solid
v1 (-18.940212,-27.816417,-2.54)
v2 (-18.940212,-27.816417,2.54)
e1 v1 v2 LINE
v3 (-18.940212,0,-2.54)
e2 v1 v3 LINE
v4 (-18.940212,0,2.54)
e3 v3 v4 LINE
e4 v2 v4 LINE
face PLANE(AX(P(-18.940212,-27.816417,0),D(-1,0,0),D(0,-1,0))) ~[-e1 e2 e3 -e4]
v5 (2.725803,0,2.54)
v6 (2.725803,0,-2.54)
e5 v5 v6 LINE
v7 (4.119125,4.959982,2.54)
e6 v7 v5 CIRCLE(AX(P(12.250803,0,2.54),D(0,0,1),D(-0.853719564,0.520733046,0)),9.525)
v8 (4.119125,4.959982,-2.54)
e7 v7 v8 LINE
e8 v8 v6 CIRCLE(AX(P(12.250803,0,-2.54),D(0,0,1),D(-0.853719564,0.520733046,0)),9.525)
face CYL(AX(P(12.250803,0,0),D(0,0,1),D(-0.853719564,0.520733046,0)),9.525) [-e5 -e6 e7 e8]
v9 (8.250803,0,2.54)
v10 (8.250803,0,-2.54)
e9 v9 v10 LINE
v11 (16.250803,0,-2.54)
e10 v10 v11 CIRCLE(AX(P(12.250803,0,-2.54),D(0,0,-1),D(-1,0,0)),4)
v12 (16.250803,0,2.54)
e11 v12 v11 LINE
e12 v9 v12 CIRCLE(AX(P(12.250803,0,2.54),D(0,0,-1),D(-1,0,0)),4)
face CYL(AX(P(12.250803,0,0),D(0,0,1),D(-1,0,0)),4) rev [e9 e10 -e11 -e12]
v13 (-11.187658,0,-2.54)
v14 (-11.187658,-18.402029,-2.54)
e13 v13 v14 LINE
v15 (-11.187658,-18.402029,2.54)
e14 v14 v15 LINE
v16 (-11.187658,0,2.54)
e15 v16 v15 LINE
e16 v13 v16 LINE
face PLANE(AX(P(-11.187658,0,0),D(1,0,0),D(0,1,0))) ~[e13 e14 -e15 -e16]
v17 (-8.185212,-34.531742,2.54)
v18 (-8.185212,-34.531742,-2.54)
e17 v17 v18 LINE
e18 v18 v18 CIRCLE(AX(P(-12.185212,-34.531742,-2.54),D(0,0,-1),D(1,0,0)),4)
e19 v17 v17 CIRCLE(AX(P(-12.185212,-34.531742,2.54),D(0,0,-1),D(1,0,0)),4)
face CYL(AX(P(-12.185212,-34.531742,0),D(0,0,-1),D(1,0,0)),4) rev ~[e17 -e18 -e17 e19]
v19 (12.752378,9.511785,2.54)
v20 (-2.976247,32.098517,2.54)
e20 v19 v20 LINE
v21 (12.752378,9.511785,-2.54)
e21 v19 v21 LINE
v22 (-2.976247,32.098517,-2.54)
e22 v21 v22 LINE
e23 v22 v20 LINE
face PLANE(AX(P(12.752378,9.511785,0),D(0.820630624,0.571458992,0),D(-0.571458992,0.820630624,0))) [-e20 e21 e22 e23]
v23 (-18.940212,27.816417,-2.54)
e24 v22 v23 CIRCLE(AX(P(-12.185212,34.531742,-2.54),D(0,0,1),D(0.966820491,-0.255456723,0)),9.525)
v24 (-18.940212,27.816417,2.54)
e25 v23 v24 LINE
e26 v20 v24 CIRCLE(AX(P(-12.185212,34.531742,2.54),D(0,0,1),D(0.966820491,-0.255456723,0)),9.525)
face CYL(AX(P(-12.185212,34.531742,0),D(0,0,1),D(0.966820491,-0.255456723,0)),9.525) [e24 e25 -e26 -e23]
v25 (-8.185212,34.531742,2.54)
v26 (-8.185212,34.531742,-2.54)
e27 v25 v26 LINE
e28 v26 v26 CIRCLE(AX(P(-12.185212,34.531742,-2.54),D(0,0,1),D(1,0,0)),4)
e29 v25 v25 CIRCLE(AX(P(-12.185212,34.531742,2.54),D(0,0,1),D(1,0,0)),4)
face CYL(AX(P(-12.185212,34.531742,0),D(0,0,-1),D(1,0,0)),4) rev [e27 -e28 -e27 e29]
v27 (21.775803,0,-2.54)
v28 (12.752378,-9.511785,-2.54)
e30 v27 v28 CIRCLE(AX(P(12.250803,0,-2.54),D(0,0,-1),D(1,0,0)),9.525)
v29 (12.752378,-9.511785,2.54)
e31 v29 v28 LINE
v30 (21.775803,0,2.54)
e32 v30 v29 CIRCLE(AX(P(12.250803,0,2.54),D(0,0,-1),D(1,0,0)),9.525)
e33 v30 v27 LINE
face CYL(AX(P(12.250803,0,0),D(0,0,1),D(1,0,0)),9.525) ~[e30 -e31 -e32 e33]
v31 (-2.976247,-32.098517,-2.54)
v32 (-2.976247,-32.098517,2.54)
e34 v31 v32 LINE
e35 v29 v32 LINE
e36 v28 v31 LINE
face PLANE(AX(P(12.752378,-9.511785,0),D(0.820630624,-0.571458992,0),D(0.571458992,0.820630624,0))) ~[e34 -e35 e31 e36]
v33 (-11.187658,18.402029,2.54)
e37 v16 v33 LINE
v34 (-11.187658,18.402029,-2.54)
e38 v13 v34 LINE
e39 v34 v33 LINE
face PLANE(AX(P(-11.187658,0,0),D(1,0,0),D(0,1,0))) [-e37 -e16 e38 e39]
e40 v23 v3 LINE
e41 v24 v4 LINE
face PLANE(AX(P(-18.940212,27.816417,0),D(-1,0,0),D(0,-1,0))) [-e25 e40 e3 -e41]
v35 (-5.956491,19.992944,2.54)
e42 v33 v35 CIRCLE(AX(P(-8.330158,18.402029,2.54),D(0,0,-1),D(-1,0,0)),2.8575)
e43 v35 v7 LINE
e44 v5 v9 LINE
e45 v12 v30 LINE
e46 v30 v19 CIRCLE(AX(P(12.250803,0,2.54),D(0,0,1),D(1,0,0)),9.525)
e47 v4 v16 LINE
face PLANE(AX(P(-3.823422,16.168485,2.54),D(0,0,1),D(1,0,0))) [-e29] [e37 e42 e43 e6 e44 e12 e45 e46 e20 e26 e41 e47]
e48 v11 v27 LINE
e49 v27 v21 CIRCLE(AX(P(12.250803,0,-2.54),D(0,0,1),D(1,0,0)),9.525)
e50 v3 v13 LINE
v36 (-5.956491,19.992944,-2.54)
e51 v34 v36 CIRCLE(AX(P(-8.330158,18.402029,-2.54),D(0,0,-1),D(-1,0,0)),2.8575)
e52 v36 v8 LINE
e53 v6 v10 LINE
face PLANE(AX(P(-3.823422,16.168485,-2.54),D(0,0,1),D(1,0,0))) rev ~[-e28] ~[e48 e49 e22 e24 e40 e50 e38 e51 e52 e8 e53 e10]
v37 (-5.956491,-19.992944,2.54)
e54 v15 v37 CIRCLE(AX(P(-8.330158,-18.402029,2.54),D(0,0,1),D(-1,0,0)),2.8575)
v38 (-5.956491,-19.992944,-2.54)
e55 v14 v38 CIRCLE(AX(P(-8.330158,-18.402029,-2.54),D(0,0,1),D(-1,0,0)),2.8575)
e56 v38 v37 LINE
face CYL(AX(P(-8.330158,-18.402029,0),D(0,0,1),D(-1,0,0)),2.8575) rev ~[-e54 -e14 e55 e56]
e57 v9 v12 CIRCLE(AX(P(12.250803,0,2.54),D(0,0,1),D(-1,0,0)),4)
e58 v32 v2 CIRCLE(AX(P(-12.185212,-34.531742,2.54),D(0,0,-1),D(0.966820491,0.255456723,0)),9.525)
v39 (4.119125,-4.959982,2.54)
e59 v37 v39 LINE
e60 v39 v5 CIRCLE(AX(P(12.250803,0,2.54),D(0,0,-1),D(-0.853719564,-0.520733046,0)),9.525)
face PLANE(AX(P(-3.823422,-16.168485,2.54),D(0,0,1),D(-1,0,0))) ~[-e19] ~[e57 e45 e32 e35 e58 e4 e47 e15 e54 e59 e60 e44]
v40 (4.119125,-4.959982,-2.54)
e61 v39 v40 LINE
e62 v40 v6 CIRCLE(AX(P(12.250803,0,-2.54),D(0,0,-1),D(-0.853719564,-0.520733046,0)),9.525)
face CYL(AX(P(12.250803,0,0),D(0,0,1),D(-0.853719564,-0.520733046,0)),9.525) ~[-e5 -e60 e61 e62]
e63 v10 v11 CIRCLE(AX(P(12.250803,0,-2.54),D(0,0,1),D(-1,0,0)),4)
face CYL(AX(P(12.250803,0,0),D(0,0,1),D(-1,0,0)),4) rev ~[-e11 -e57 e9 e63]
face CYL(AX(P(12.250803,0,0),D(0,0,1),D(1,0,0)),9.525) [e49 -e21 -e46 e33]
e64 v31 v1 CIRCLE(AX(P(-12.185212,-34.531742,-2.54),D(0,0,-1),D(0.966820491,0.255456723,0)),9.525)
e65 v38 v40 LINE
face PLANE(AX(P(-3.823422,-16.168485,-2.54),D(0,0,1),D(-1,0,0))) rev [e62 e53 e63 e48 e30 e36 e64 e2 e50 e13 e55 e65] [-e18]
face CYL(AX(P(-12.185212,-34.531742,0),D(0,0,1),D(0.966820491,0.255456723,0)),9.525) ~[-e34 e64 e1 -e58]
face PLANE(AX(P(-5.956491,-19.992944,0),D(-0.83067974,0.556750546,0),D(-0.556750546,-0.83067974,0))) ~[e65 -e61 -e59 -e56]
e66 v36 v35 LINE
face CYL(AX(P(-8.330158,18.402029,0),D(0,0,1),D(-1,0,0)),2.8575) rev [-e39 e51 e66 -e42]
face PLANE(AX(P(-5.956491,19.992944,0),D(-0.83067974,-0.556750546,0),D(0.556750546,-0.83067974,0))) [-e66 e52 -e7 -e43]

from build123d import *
from build123d import SkipClean  # not in build123d's __all__

# Parameters (mm, degrees)
F0_R     = 4
F1_DEPTH = 2.54


with BuildPart() as f1:
    # F0 (on Top) → F1 (new body, symmetric)
    with BuildSketch(Plane.XY):
        with BuildLine():
            Line((12.7523779158, 9.5117846914), (-2.9762470444, 32.0985170452))
            ThreePointArc((-2.9762470444, 32.0985170452), (-14.6529201579, 43.7315272534), (-18.9402122051, 27.8164165593))
            Line((-18.9402122051, 27.8164165593), (-18.9402122051, 0))
            Line((-18.9402122051, 0), (-11.187657958, 0))
            Line((-11.187657958, 0), (-11.187657958, 18.4020288289))
            ThreePointArc((-11.187657958, 18.4020288289), (-9.1615879854, 21.1358961189), (-5.9564906022, 19.9929435136))
            Line((-5.9564906022, 19.9929435136), (4.1191245614, 4.9599822668))
            ThreePointArc((4.1191245614, 4.9599822668), (3.0807470851, 2.5759836915), (2.725803411, 0))
            Line((2.725803411, 0), (8.250803411, 0))
            ThreePointArc((8.250803411, 0), (12.250803411, 4), (16.250803411, 0))
            Line((16.250803411, 0), (21.775803411, 0))
            ThreePointArc((21.775803411, 0), (19.1610538463, 6.5554606185), (12.7523779158, 9.5117846914))
        make_face()
        with Locations((-12.1852122247, 34.5317423344)):
            Circle(F0_R, mode=Mode.SUBTRACT)
    extrude(amount=F1_DEPTH, both=True)

    # F2: F1 across plane


with BuildPart() as f1_1:
    add(f1.part, clean=False)
    with SkipClean():  # cleaning this boolean's faces spoils the solid; the shape is the same uncleaned
        add(f1.part.mirror(Plane.XZ), clean=False)


solid = f1_1.part
